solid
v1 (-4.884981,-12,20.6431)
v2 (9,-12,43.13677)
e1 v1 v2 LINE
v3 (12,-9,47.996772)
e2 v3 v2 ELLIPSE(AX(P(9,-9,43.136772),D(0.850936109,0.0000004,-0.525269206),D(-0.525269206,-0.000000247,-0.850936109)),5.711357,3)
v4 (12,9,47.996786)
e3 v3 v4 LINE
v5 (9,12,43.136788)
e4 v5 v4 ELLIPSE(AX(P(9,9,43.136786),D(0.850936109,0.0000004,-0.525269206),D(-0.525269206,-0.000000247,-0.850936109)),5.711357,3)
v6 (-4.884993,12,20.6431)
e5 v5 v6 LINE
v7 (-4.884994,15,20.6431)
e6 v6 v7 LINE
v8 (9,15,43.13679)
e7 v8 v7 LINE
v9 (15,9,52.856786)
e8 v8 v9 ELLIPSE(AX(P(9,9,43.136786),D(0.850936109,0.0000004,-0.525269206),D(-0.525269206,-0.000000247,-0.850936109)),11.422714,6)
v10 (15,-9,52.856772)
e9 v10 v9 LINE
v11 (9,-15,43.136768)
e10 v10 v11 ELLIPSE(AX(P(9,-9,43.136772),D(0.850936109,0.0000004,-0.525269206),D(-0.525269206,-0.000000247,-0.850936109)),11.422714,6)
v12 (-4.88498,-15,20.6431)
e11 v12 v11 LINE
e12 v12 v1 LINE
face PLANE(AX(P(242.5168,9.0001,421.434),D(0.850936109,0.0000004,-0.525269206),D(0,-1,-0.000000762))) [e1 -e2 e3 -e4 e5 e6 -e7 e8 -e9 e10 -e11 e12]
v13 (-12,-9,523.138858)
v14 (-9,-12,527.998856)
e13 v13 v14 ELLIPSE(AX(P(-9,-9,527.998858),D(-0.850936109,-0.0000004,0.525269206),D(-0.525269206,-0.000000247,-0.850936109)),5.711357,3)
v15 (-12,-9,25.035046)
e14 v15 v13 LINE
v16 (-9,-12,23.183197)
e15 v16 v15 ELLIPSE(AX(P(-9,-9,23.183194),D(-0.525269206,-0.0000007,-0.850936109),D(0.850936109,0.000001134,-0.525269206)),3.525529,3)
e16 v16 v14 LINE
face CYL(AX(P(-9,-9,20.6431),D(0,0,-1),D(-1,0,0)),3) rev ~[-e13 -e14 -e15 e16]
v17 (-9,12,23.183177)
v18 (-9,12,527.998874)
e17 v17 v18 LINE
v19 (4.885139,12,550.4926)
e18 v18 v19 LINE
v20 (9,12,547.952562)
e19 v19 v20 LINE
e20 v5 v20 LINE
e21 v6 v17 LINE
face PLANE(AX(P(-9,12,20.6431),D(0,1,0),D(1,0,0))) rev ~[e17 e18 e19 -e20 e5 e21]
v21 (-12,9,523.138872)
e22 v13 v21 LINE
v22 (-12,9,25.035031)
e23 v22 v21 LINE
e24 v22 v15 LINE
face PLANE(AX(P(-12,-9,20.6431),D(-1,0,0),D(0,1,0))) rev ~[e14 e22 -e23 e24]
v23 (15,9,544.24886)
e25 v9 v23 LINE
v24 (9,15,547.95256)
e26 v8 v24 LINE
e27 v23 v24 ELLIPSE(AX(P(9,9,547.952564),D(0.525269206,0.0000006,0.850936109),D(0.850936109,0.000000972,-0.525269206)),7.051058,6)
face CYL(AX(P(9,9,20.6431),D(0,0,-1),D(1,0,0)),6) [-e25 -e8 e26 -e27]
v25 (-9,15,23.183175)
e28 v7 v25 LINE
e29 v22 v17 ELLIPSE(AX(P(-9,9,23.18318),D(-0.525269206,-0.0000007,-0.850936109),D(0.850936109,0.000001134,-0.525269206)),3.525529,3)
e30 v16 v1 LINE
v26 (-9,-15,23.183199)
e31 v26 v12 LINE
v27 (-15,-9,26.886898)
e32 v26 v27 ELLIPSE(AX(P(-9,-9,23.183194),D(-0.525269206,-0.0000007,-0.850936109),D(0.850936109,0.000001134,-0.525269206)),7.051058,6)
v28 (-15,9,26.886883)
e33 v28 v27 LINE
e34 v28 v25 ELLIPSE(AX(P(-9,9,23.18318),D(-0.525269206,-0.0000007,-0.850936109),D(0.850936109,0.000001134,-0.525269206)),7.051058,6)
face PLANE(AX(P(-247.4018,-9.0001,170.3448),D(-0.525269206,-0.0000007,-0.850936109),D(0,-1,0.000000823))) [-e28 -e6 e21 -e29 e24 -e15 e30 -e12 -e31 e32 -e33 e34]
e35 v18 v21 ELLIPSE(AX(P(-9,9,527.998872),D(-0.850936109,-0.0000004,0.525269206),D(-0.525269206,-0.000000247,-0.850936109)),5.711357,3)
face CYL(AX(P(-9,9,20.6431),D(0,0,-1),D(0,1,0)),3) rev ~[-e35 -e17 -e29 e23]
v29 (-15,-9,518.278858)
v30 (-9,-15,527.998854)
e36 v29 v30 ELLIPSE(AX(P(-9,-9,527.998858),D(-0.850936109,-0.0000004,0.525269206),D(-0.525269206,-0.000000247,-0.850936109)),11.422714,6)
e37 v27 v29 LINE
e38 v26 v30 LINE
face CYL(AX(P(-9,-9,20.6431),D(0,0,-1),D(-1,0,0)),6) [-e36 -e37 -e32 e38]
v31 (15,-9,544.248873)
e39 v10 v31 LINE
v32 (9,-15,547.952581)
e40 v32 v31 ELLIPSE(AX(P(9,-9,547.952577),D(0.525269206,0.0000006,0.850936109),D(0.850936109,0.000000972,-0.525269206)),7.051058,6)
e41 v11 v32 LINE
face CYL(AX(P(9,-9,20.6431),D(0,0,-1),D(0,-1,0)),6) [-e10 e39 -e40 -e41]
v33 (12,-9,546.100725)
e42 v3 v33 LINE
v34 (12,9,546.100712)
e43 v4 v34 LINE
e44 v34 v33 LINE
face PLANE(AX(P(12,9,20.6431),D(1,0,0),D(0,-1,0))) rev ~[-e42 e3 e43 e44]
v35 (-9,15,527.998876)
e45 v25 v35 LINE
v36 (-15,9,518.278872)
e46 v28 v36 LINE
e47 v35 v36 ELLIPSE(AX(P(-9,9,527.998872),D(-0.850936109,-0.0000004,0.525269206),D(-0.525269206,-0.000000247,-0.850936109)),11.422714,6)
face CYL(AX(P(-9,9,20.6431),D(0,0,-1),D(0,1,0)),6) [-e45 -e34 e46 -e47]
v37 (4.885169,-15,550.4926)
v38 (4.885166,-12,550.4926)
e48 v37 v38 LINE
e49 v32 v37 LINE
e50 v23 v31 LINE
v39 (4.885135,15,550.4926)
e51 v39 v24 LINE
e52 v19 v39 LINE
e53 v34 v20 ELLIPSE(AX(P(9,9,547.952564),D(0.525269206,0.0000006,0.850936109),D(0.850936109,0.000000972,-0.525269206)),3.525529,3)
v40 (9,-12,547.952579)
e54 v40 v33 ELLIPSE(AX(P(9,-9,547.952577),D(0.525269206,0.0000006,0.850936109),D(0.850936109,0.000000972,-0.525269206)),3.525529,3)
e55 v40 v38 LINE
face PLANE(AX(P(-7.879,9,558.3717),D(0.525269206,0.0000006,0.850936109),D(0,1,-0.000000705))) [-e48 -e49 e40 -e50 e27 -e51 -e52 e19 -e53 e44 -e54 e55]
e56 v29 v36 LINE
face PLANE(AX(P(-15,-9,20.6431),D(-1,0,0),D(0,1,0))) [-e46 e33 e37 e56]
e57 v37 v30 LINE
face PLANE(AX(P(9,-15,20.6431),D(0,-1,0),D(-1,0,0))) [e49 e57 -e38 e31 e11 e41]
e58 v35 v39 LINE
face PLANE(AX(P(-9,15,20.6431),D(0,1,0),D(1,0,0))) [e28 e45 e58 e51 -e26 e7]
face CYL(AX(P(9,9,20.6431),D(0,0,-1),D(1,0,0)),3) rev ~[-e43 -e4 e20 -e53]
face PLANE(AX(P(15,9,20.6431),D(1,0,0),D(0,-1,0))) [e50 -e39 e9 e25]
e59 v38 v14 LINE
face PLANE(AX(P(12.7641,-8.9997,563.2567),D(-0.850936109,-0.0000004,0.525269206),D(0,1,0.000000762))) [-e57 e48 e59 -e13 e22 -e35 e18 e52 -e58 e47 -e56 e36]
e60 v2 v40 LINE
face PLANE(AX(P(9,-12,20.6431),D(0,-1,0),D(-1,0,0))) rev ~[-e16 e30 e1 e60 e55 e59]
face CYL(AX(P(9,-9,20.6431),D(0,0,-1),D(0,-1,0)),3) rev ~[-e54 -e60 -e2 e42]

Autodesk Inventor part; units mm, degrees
ref_plane "Start Plane" through (0, 0, 20.6431) normal (0, 0, 1) x (1, 0, 0)
ref_plane "End Plane" through (0, 0, 550.4926) normal (0, 0, 1) x (1, 0, 0)
sketch "Sketch" plane through (0, 0, 0) normal (0, 0, 1) x (1, 0, 0)
  line L0 (-15, -9) -> (-15, 9)
  line L1 (-9, 15) -> (9, 15)
  line L2 (15, 9) -> (15, -9)
  line L3 (9, -15) -> (-9, -15)
  arc A0 (-15, -9) -> (-9, -15) centre (-9, -9) ccw
  arc A1 (-9, 15) -> (-15, 9) centre (-9, 9) ccw
  arc A2 (15, 9) -> (9, 15) centre (9, 9) ccw
  arc A3 (9, -15) -> (15, -9) centre (9, -9) ccw
  arc A4 (-9, 12) -> (-12, 9) centre (-9, 9) ccw
  line L4 (-9, 12) -> (9, 12)
  arc A5 (12, 9) -> (9, 12) centre (9, 9) ccw
  line L5 (12, 9) -> (12, -9)
  arc A6 (9, -12) -> (12, -9) centre (9, -9) ccw
  line L6 (9, -12) -> (-9, -12)
  arc A7 (-12, -9) -> (-9, -12) centre (-9, -9) ccw
  line L7 (-12, -9) -> (-12, 9)
  line L8 (0, 22.7397) -> (0, -22.7397) construction
  line L9 (-22.7397, 0) -> (22.7397, 0) construction
  dimension "d7" = 6
  dimension "d10" = 30
  dimension "d11" = 30
  dimension "d12" = 3
  dimension "d15" = 15
  dimension "d16" = 15
extrude "Body" add sketch "Sketch" along normal up to surface (529.8495 mm away) from surface at 20.6431
sketch "Sketch3" plane through (0, 0, 0) normal (0, 0, 1) x (1, 0, 0)
  line L0 (0, 0) -> (10, 0)
ref_plane "Work Plane3" through (0, 0, 0) normal (0, -1, 0) x (1, 0, 0)
ref_plane "Work Plane4" through (242.5168, 9.0001, 421.434) normal (0.8509361, 0.0000004, -0.5252692) x (-0.5252692, -0.0000006, -0.8509361)
split "Split1" plane through (242.5168, 9.0001, 421.434) removes the side toward (0.8509361, 0.0000004, -0.5252692)
ref_plane "Work Plane5" through (-247.4018, -9.0001, 170.3448) normal (-0.5252692, -0.0000007, -0.8509361) x (-0.8509361, -0.0000026, 0.5252692)
split "Split2" plane through (-247.4018, -9.0001, 170.3448) removes the side toward (-0.5252692, -0.0000007, -0.8509361)
ref_plane "Work Plane6" through (-7.879, 9, 558.3717) normal (0.5252692, 0.0000006, 0.8509361) x (0.8509361, -0.0000002, -0.5252692)
split "Split3" plane through (-7.879, 9, 558.3717) removes the side toward (0.5252692, 0.0000006, 0.8509361)
ref_plane "Work Plane7" through (12.7641, -8.9997, 563.2567) normal (-0.8509361, -0.0000004, 0.5252692) x (0.5252692, -0.0000002, 0.8509361)
split "Split4" plane through (12.7641, -8.9997, 563.2567) removes the side toward (-0.8509361, -0.0000004, 0.5252692)
sketch "Sketch4" plane through (0, 0, 0) normal (0, -1, 0) x (1, 0, 0)
  line L0 (-2, 20.6431) -> (12, 20.6431) projected
  line L1 (-2, 550.4926) -> (12, 550.4926) projected
  dimension "d18" = 529.8495
equation "\"d7\" = G_IR"
equation "\"d10\" = G_H"
equation "\"d11\" = G_W"
equation "\"d12\" = G_T"
equation "\"d15\" = 0.5 * d10"
equation "\"d16\" = 0.5 * d11"
equation "\"d3\" = G_L"
equation "\"G_W\" = 30"
equation "\"G_H\" = 30"
equation "\"G_T\" = 3"
equation "\"G_IR\" = 6"
equation "\"G_L\" = d18"
equation "\"G_OFFSET_START\" = -20.64309"
equation "\"G_OFFSET_END\" = -20.64308"
equation "\"d13\" = -G_OFFSET_START"
equation "\"d14\" = G_OFFSET_END + B_L"
equation "\"B_L\" = 571.1357"
properties part number "DIN EN 10219-2 - 30 x 30 x 3  - 529.85" material "Steel, Mild"
